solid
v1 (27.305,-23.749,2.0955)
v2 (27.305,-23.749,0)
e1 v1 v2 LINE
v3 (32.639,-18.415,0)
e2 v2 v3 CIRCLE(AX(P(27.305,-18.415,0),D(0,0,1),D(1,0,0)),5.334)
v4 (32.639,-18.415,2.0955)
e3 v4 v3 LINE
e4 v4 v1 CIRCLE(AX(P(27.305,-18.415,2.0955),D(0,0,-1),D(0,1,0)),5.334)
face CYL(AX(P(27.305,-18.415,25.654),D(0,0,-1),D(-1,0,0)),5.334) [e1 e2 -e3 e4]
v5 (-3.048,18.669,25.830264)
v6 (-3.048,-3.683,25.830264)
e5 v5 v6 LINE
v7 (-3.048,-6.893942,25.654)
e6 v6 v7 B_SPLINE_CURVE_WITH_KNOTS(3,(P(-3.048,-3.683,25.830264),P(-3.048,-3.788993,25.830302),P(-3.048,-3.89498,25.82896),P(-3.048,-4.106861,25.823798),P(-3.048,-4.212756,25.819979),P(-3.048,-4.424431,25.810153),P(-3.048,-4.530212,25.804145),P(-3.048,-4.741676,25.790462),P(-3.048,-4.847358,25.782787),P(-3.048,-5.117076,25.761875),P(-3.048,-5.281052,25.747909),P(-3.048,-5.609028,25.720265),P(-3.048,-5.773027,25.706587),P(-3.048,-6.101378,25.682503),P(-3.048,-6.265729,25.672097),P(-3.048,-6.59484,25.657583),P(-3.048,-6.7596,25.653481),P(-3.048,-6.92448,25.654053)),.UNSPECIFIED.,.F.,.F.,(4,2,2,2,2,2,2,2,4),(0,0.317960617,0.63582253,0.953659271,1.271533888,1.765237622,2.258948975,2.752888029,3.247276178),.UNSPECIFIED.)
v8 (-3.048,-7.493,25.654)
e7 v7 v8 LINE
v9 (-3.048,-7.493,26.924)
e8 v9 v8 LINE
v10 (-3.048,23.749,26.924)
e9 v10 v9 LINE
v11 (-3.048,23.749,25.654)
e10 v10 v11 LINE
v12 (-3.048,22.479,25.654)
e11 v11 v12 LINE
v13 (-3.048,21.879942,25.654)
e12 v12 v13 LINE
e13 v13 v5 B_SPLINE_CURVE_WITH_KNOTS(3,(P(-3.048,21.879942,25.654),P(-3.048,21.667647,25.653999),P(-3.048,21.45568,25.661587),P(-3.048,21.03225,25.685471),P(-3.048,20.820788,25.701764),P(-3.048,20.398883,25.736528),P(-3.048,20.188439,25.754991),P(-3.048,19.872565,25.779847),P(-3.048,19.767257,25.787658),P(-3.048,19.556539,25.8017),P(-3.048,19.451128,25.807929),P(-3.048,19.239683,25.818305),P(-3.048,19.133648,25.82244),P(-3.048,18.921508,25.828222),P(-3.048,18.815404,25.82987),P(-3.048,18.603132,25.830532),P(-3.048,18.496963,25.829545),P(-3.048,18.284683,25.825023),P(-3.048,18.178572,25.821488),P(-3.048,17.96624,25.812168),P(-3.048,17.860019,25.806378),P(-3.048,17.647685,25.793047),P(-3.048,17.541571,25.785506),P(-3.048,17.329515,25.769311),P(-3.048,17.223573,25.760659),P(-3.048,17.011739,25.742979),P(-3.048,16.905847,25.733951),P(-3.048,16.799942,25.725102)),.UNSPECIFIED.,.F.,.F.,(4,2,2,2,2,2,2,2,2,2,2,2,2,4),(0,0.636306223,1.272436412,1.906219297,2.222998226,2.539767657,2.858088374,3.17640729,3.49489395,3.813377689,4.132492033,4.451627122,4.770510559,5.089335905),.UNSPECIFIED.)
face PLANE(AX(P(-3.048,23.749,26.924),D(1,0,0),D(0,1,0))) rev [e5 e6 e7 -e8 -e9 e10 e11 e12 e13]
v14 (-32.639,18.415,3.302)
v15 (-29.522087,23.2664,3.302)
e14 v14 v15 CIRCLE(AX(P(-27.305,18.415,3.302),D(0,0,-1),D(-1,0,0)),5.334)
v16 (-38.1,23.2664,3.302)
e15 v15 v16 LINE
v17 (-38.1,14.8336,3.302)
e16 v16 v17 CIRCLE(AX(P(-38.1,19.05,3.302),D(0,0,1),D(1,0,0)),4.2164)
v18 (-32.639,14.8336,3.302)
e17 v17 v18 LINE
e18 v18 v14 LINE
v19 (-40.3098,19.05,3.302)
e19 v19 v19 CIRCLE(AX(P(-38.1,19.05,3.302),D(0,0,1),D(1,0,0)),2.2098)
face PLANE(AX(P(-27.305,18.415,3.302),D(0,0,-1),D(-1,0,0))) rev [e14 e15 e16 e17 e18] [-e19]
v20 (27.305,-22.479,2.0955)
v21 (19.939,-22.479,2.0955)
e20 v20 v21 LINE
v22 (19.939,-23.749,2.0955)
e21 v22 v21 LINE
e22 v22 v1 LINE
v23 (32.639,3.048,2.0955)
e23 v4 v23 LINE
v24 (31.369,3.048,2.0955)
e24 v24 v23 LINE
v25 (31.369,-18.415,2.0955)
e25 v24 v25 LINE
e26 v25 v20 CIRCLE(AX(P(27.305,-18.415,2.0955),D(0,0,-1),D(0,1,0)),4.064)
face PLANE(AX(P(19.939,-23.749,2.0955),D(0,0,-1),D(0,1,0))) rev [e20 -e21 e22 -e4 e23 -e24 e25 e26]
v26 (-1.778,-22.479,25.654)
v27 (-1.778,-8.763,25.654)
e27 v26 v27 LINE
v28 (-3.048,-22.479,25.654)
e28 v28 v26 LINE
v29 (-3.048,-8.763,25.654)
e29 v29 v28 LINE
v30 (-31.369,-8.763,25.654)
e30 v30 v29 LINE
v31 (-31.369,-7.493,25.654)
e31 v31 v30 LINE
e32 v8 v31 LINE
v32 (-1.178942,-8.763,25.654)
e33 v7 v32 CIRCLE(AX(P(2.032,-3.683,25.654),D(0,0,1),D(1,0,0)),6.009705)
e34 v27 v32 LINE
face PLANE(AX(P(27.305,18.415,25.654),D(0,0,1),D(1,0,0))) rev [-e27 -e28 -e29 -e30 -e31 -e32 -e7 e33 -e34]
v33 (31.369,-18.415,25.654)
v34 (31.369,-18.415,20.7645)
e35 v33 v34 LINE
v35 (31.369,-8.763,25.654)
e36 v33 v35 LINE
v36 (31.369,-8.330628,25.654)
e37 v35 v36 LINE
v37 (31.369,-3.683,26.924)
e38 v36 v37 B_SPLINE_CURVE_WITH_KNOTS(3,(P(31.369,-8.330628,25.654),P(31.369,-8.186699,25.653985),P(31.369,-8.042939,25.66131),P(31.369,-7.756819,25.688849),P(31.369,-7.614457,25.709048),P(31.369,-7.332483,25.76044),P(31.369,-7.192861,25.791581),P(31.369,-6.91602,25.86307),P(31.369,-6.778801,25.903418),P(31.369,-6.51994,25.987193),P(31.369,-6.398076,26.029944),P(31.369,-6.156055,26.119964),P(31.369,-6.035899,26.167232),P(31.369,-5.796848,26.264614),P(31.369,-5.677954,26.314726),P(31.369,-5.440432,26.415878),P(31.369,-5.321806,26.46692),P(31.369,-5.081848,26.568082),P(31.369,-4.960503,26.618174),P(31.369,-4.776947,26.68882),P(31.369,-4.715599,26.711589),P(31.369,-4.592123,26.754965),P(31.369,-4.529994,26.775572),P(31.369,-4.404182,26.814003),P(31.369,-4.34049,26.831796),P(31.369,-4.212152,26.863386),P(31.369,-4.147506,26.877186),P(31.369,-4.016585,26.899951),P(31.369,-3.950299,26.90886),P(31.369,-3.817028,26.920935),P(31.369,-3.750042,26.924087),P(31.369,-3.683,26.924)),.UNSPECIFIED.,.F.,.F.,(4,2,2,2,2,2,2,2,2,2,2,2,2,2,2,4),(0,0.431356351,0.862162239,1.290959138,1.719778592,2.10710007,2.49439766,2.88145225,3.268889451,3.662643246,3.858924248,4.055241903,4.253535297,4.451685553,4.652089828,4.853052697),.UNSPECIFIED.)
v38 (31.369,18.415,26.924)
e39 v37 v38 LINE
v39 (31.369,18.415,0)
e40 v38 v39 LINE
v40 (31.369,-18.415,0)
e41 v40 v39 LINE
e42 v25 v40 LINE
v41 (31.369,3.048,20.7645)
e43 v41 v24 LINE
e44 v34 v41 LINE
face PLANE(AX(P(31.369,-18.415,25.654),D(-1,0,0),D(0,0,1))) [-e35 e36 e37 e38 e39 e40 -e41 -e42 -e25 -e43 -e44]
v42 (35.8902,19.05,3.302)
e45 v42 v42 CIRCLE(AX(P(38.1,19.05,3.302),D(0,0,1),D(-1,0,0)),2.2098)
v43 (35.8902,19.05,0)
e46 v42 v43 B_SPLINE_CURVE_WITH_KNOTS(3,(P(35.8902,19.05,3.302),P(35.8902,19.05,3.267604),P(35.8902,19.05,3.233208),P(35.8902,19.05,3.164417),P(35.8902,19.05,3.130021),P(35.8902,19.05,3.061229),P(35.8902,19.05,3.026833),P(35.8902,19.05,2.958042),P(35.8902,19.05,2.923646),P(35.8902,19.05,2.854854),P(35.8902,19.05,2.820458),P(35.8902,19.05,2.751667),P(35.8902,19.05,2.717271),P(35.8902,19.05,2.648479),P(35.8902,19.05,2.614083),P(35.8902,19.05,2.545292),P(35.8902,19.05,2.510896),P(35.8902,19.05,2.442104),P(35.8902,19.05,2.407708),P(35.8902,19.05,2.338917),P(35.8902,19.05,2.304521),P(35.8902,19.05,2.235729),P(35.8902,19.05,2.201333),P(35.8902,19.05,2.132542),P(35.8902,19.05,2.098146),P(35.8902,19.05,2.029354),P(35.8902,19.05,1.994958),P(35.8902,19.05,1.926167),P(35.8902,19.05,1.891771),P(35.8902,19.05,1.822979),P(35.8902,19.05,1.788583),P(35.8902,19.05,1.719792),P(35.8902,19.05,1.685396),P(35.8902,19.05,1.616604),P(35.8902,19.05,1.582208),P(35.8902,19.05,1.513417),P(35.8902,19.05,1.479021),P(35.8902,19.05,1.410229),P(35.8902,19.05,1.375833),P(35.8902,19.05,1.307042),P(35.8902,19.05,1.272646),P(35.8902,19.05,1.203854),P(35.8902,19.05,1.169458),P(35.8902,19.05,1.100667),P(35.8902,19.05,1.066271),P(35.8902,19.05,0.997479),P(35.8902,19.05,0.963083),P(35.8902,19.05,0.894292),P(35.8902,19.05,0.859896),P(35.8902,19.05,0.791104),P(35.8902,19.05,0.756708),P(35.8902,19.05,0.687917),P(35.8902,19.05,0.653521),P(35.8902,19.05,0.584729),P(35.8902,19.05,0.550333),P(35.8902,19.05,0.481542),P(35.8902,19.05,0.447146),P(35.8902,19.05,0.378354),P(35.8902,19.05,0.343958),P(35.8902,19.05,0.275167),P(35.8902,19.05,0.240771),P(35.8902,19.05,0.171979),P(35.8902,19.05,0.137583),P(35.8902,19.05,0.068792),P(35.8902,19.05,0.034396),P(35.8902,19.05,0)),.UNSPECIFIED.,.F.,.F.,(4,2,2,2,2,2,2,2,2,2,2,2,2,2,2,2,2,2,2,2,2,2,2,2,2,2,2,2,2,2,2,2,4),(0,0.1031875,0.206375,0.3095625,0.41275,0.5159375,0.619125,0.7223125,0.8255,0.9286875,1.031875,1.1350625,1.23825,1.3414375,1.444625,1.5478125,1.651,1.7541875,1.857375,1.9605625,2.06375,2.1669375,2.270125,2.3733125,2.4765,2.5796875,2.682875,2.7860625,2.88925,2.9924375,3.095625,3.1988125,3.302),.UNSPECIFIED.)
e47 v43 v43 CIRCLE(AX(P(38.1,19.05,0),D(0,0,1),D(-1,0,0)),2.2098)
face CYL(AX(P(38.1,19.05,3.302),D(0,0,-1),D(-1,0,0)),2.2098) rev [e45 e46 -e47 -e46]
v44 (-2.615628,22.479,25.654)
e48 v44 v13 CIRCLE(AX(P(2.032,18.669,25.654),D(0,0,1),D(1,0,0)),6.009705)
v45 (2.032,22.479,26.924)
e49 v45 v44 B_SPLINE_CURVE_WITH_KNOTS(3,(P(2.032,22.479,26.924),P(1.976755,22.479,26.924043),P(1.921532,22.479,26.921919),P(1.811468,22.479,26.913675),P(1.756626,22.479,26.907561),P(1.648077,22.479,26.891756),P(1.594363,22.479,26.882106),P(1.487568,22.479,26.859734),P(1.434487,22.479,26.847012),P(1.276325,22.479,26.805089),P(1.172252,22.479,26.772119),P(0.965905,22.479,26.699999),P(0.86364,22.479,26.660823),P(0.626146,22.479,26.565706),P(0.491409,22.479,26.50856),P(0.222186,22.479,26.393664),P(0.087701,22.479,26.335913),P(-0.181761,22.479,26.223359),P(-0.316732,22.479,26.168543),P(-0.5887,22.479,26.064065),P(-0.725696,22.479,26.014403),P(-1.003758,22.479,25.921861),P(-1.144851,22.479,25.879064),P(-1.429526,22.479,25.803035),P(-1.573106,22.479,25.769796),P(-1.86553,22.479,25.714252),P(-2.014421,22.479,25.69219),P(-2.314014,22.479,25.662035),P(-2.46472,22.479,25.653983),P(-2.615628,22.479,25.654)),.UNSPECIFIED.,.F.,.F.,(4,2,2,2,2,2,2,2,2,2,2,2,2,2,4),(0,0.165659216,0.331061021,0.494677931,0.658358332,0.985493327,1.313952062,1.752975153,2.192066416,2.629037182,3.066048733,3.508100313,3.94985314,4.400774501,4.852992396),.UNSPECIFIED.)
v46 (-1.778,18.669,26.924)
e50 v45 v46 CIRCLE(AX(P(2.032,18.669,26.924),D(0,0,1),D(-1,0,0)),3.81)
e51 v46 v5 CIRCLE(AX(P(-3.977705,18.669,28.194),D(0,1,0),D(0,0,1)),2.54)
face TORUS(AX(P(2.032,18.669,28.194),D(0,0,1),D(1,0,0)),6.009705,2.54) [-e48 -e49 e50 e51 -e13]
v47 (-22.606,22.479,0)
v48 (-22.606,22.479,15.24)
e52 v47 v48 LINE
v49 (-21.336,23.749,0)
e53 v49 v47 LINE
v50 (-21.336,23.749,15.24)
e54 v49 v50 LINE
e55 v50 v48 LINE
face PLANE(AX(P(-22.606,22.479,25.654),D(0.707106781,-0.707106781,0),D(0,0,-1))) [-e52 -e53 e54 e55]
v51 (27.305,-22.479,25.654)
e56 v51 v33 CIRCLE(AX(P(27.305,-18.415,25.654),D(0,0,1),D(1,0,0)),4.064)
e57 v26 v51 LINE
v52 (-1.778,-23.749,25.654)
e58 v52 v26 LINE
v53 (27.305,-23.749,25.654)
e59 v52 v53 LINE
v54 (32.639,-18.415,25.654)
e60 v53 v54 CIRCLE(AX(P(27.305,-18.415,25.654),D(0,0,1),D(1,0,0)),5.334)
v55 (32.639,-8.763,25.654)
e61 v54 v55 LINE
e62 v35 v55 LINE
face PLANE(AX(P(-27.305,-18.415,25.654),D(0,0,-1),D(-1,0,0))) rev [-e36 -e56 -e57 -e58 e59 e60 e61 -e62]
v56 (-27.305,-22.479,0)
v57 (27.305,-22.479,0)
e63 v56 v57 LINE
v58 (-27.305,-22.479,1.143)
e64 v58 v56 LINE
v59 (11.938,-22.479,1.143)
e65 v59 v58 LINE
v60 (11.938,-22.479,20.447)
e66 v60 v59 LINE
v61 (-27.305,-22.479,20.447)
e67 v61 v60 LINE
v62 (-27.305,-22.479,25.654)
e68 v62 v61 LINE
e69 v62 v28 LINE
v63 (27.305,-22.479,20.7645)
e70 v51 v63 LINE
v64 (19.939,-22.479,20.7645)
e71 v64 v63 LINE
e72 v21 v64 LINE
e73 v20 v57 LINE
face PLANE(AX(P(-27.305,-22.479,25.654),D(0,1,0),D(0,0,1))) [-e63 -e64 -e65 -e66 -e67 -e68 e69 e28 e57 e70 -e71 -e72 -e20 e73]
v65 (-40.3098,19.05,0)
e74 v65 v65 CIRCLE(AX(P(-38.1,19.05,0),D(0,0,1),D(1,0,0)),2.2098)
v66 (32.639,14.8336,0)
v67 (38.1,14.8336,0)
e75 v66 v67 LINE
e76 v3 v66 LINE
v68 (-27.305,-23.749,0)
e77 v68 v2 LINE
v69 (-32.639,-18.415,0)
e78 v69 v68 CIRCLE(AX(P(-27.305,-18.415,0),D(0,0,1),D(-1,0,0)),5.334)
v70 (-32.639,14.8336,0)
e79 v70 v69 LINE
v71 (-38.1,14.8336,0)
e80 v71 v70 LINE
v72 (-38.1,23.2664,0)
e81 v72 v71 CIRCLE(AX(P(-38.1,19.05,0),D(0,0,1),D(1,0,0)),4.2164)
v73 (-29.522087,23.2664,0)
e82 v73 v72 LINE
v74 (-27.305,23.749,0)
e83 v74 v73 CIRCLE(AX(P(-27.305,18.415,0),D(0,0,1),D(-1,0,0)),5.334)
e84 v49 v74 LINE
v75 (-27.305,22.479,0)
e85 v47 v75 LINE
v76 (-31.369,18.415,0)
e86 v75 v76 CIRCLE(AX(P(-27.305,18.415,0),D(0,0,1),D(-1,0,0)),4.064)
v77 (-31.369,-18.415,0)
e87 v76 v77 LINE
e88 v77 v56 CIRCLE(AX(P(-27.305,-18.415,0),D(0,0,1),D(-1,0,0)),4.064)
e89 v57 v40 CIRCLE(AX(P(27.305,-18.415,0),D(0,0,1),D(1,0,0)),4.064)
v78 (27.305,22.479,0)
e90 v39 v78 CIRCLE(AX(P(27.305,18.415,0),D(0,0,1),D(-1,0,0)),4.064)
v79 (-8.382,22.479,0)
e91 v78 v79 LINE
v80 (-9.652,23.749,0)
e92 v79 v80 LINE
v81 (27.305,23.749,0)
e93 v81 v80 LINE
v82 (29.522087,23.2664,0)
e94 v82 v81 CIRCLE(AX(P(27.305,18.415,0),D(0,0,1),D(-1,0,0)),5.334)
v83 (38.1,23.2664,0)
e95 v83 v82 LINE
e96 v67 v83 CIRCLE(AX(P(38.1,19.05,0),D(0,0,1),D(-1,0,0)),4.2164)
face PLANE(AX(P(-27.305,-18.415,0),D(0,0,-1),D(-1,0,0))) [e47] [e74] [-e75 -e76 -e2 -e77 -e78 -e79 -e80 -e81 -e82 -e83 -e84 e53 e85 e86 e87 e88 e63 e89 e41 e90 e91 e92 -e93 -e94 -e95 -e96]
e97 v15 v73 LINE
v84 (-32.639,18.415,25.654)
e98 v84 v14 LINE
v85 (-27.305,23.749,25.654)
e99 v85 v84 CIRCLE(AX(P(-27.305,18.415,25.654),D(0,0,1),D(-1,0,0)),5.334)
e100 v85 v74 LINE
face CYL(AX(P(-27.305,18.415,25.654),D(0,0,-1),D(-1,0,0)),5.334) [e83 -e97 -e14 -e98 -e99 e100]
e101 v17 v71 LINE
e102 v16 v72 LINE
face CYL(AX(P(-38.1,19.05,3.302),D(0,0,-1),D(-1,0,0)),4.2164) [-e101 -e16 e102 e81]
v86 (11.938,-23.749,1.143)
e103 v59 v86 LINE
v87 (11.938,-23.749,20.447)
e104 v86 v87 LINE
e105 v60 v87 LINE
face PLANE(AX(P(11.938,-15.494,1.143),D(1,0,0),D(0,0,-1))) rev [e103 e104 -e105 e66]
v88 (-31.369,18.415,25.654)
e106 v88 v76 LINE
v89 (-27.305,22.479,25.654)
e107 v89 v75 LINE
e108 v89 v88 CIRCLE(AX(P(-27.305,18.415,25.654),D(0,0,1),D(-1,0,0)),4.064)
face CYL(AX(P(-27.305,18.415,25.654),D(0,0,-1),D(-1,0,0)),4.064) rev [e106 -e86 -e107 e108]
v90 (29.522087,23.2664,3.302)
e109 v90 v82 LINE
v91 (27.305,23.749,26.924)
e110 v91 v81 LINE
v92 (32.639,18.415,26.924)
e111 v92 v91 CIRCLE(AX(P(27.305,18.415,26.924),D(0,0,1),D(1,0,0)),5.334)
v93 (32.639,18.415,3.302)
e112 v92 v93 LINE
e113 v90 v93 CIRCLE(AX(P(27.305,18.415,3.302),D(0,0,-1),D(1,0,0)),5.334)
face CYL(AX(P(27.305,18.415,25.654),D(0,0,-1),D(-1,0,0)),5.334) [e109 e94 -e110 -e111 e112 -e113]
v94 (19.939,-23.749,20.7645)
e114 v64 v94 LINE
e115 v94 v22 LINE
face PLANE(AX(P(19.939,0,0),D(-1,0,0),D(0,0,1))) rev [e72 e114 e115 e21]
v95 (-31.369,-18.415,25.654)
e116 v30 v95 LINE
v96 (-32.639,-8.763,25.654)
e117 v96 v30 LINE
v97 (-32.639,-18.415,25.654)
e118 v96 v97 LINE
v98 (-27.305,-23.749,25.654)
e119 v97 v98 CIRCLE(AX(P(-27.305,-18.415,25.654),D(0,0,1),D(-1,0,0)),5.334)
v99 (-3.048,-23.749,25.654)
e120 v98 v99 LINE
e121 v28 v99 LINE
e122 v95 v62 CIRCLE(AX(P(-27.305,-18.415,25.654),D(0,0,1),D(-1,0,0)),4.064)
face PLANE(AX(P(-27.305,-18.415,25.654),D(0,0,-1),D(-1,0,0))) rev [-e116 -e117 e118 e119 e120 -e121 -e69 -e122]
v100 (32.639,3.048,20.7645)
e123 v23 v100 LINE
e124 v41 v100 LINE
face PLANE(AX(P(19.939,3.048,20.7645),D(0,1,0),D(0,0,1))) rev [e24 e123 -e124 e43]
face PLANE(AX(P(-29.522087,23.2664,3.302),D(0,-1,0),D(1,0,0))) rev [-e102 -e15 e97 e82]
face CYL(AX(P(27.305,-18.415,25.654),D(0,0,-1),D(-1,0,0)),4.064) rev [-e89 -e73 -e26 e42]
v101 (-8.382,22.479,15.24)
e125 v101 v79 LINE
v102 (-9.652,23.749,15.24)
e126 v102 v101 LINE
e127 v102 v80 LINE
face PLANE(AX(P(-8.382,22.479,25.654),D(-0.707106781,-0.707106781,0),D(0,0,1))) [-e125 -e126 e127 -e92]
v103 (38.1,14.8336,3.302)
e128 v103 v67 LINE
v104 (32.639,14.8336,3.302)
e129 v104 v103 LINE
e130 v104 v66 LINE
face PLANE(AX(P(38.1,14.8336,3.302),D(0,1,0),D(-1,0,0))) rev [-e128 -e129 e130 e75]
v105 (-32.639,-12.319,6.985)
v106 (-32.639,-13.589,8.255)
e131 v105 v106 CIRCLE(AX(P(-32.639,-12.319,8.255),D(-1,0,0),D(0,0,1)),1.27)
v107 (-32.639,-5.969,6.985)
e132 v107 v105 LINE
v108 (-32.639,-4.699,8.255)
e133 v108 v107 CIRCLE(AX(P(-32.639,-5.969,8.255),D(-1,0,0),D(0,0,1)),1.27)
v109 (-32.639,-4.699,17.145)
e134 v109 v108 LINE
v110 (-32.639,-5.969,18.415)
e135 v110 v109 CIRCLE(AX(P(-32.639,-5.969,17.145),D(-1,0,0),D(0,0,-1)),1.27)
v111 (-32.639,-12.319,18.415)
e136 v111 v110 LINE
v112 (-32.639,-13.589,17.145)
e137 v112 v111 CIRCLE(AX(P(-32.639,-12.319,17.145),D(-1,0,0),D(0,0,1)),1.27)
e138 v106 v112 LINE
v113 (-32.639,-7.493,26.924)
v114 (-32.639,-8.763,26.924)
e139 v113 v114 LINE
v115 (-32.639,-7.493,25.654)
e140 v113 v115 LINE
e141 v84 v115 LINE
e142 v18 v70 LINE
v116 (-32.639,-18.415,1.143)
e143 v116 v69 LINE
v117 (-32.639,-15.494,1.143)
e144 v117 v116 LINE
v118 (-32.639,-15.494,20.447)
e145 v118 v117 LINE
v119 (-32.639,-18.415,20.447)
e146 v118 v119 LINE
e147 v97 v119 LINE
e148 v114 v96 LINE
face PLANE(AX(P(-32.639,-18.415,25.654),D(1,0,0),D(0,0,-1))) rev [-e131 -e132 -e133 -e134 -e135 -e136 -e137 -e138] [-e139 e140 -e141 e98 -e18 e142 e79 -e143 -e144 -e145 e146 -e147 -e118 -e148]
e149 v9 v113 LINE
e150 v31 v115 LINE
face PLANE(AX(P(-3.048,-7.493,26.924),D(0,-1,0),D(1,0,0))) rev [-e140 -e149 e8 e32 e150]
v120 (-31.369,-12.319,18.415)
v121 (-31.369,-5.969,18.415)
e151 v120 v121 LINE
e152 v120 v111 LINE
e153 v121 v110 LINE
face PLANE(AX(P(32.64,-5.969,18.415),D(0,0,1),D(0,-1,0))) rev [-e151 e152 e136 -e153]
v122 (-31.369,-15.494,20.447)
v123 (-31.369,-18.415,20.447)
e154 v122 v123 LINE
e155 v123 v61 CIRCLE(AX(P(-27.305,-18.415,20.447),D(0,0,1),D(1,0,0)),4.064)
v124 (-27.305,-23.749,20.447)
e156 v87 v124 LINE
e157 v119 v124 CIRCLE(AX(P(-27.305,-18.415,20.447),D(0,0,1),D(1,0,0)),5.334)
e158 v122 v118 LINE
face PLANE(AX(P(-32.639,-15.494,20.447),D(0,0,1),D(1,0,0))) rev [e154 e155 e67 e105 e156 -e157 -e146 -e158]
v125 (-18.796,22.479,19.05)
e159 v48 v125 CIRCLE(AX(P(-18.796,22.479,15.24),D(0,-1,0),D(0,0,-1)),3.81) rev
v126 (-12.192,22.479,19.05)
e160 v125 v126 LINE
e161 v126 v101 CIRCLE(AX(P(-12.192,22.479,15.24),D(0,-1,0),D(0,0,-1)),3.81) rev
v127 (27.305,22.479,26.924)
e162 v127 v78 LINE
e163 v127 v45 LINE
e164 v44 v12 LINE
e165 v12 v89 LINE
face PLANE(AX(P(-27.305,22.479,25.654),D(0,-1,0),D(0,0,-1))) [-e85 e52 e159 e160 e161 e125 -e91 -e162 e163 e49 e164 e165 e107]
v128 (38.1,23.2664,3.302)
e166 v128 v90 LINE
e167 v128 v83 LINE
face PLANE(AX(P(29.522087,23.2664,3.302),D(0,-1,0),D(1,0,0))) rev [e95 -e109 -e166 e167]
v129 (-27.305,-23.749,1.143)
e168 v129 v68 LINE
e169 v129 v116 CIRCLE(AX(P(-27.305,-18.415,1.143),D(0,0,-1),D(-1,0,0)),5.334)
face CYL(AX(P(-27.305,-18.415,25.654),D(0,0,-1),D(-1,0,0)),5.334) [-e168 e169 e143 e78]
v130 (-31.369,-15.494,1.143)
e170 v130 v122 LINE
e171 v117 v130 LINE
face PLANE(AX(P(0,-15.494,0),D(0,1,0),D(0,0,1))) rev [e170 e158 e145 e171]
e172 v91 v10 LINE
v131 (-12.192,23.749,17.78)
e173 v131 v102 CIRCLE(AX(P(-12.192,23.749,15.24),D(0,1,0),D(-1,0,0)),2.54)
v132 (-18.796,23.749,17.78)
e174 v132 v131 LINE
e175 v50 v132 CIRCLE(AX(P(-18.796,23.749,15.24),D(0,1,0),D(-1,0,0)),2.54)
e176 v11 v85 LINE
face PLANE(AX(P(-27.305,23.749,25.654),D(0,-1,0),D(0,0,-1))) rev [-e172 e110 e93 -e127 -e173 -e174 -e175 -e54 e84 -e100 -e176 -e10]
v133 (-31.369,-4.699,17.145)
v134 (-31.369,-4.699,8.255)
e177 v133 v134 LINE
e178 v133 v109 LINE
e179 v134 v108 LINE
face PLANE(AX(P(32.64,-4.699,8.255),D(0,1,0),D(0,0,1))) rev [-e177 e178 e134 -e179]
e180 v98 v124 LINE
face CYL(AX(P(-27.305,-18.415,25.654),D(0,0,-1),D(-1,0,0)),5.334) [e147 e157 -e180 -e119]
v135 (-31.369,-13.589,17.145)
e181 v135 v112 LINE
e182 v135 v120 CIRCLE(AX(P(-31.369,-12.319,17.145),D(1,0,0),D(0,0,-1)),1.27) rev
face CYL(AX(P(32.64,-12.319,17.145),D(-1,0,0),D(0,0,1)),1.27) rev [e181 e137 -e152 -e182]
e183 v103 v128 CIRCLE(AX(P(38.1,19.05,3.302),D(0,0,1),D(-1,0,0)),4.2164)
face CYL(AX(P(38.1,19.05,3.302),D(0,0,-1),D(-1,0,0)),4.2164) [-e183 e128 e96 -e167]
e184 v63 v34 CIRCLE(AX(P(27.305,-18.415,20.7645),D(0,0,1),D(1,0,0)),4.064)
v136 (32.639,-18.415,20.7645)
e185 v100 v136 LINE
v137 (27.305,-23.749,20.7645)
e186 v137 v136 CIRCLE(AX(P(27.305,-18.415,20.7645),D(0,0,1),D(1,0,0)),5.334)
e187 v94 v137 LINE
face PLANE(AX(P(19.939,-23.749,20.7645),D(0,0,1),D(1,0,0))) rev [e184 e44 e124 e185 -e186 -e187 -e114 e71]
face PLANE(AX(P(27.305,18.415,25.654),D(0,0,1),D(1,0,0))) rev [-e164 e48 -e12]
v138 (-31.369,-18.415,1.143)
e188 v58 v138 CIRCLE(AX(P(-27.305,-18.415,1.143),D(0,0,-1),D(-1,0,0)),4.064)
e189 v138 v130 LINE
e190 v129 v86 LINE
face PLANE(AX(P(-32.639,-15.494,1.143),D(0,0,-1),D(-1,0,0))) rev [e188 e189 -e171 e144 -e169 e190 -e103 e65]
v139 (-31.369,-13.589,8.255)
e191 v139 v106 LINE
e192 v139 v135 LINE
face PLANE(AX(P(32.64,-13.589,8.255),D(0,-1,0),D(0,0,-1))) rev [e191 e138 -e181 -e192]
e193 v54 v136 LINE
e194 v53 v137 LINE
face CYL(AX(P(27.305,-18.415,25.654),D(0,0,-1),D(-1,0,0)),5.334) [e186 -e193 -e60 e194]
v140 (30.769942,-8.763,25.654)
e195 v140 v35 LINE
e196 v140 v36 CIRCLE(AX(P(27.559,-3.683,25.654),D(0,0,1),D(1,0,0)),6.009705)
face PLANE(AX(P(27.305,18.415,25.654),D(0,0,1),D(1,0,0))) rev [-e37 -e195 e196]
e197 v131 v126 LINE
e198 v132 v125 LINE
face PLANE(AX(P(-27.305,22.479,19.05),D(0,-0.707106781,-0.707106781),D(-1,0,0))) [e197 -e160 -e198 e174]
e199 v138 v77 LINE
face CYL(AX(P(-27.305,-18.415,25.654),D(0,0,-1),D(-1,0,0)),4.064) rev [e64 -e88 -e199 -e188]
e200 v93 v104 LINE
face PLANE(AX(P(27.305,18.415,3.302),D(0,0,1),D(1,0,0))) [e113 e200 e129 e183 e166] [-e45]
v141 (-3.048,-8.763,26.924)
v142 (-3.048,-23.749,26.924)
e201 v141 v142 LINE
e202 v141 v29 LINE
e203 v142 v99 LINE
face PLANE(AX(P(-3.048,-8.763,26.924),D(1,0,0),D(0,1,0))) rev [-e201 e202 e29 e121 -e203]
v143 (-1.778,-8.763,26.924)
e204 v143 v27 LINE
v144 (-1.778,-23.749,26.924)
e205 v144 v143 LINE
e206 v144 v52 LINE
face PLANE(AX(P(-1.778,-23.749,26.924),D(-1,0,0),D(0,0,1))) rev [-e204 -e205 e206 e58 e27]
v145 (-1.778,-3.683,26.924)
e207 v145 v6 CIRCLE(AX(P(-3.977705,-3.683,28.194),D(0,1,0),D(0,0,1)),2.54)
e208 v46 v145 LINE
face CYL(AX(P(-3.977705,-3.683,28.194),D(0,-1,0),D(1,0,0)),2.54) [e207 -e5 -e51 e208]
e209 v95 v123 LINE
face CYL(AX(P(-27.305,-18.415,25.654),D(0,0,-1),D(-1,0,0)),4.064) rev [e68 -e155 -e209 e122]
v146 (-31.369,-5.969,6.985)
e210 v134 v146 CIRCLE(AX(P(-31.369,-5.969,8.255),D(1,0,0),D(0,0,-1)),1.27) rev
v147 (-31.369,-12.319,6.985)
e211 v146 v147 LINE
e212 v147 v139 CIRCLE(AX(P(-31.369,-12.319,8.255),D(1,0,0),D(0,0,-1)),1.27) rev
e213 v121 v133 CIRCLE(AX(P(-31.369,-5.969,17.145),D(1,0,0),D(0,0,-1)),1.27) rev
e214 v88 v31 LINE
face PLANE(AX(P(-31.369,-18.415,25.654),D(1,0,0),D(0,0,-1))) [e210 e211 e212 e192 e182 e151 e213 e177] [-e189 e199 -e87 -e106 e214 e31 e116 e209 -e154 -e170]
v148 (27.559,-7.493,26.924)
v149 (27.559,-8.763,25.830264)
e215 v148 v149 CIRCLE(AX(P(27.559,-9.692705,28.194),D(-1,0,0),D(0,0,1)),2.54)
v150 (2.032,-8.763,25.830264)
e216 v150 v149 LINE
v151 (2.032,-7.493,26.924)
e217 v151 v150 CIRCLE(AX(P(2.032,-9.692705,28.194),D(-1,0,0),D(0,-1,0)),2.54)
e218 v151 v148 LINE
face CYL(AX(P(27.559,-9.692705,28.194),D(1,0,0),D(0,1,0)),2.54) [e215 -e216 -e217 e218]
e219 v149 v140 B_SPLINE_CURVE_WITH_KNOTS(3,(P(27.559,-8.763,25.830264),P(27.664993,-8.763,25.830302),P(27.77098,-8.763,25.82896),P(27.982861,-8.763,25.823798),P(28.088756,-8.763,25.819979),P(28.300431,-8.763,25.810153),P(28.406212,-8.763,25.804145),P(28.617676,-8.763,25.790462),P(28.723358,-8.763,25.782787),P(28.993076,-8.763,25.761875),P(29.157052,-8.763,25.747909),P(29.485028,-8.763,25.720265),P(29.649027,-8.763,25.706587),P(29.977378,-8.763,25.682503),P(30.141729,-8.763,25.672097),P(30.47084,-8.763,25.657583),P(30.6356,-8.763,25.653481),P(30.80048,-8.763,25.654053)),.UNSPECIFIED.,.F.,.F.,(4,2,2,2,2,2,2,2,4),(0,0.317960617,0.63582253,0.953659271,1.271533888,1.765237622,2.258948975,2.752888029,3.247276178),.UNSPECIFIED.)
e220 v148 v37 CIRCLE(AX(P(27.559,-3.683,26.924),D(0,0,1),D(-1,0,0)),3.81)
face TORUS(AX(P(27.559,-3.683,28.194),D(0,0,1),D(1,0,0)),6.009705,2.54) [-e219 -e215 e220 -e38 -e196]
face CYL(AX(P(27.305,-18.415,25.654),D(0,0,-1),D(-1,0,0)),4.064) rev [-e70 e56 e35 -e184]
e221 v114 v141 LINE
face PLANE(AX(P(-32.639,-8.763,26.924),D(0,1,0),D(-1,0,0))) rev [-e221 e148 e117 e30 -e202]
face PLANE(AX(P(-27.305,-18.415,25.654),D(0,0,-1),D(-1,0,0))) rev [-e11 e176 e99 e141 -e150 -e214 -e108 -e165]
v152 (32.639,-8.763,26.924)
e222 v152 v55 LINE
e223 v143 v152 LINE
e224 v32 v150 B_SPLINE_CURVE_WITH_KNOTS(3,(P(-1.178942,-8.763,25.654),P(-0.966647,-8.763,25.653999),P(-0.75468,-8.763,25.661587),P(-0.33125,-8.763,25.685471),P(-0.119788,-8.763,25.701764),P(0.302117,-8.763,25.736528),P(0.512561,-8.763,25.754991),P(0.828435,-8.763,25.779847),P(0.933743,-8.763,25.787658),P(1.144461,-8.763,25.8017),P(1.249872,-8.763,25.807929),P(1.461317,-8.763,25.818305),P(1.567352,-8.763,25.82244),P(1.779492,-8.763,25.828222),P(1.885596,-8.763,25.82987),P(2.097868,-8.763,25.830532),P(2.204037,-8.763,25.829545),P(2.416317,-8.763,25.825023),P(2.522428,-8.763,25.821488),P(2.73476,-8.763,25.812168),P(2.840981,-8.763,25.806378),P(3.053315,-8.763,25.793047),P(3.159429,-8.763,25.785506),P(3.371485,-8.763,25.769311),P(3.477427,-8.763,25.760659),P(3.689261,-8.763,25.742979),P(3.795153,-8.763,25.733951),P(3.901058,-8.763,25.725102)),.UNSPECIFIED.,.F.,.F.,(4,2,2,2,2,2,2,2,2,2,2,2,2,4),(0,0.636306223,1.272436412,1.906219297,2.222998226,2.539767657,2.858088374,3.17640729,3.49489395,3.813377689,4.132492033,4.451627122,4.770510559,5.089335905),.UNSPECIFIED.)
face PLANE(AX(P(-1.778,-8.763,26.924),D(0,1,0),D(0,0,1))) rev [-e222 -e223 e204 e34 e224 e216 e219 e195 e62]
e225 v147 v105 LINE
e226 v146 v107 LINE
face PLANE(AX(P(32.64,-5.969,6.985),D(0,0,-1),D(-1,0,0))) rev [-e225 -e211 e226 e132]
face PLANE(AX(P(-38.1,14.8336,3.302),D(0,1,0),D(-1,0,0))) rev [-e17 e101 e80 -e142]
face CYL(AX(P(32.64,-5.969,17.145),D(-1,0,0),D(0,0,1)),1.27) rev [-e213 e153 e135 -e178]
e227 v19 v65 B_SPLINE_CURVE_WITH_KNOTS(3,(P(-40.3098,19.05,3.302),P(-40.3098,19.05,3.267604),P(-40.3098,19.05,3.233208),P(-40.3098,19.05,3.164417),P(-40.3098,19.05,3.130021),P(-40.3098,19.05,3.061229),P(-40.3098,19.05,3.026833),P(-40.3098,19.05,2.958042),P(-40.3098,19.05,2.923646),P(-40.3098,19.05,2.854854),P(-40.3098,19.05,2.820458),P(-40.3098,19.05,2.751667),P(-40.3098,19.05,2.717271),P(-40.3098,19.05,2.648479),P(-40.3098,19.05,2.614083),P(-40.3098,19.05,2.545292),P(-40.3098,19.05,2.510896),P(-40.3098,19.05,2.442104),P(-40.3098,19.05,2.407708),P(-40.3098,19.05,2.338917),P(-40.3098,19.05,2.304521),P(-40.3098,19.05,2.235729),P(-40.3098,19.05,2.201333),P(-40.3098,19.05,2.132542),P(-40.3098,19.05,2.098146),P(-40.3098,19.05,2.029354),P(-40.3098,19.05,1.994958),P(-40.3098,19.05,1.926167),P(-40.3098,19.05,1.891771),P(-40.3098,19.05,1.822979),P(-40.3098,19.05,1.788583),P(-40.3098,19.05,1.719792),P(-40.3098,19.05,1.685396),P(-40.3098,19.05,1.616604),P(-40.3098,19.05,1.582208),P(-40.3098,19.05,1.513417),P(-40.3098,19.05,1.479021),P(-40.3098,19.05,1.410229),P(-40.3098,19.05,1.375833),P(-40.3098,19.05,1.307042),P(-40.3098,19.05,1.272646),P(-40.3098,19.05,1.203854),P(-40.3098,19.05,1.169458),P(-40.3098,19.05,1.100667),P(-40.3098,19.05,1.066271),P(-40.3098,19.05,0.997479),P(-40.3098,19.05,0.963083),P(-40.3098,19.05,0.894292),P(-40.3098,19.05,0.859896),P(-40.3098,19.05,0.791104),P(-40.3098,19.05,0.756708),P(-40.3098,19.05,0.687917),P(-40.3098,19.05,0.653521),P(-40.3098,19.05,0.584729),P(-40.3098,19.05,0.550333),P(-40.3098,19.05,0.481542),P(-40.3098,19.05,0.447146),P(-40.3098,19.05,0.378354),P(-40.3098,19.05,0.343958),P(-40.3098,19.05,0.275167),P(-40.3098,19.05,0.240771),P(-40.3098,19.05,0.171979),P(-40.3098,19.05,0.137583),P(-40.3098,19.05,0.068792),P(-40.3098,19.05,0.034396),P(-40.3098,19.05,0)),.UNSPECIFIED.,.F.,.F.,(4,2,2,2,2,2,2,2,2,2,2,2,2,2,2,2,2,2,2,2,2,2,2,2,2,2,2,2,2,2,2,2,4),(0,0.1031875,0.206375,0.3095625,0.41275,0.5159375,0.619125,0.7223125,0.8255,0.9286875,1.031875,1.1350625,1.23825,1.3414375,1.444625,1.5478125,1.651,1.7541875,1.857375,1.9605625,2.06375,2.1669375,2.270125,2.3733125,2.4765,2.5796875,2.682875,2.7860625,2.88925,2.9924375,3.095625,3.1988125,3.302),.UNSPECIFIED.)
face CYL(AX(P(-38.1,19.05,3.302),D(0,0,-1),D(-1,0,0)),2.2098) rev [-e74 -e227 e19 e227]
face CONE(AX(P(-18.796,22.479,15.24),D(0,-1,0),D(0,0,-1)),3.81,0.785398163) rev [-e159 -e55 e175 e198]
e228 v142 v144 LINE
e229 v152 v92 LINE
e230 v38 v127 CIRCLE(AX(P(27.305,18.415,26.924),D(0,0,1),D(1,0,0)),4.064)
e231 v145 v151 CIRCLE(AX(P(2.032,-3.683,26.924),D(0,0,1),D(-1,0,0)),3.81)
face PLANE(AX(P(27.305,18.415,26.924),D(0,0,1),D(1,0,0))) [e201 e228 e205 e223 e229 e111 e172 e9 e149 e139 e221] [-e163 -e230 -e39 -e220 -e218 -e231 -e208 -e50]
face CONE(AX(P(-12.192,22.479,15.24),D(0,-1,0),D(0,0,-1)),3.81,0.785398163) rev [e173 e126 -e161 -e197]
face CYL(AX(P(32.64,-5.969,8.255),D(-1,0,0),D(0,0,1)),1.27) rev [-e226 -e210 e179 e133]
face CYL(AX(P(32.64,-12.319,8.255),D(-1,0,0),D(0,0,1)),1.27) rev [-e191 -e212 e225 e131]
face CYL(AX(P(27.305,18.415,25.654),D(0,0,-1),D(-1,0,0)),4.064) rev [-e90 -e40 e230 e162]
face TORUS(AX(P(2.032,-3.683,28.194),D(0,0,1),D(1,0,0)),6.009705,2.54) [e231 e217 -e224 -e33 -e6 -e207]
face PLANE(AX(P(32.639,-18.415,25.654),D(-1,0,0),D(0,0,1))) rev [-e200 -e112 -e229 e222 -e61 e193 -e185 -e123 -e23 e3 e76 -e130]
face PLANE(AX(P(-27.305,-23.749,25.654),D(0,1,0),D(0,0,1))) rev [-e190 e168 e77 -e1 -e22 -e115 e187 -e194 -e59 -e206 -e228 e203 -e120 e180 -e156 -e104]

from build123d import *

# Parameters (mm, degrees)
BOSS_EXTRUDE1_DEPTH = 25.654
BOSS_EXTRUDE2_DEPTH = 1.27
CUT_EXTRUDE1_REACH  = 65.61
CUT_EXTRUDE2_REACH  = 76.499
SKETCH7_W           = 44.577
SKETCH7_H           = 19.304
CUT_EXTRUDE3_DEPTH  = 8.255
SKETCH8_W           = 18.669
SKETCH8_H           = 26.797
CUT_EXTRUDE4_DEPTH  = 12.7
FILLET2_R           = 2.54
SKETCH9_R           = 2.2098
BOSS_EXTRUDE3_DEPTH = 3.302
CHAMFER1_SIZE       = 1.27


# Some blends are built 0.0001 mm under size
with BuildPart() as part:
    # Sketch2 → Boss-Extrude1 (new body)
    with BuildSketch(Plane.XY):
        with BuildLine():
            Line((-27.305, -23.749), (27.305, -23.749))
            ThreePointArc((27.305, -23.749), (31.076707571, -22.186707571), (32.639, -18.415))
            Line((32.639, -18.415), (32.639, 18.415))
            ThreePointArc((32.639, 18.415), (31.076707571, 22.186707571), (27.305, 23.749))
            Line((27.305, 23.749), (-27.305, 23.749))
            ThreePointArc((-27.305, 23.749), (-31.076707571, 22.186707571), (-32.639, 18.415))
            Line((-32.639, 18.415), (-32.639, -18.415))
            ThreePointArc((-32.639, -18.415), (-31.076707571, -22.186707571), (-27.305, -23.749))
        make_face()
        with BuildLine():
            Line((-27.305, -22.479), (27.305, -22.479))
            ThreePointArc((27.305, -22.479), (30.178681959, -21.288681959), (31.369, -18.415))
            Line((31.369, -18.415), (31.369, 18.415))
            ThreePointArc((31.369, 18.415), (30.178681959, 21.288681959), (27.305, 22.479))
            Line((27.305, 22.479), (-27.305, 22.479))
            ThreePointArc((-27.305, 22.479), (-30.178681959, 21.288681959), (-31.369, 18.415))
            Line((-31.369, 18.415), (-31.369, -18.415))
            ThreePointArc((-31.369, -18.415), (-30.178681959, -21.288681959), (-27.305, -22.479))
        make_face(mode=Mode.SUBTRACT)
    extrude(amount=BOSS_EXTRUDE1_DEPTH)

    # Sketch3 → Boss-Extrude2 (add)
    with BuildSketch(Plane.XY.offset(25.654)):
        with BuildLine():
            Line((-1.778, 23.749), (27.305, 23.749))
            ThreePointArc((27.305, 23.749), (31.076707571, 22.186707571), (32.639, 18.415))
            Line((32.639, 18.415), (32.639, -7.493))
            Line((32.639, -7.493), (32.639, -8.763))
            Line((32.639, -8.763), (-1.778, -8.763))
            Line((-1.778, -8.763), (-1.778, -23.749))
            Line((-1.778, -23.749), (-3.048, -23.749))
            Line((-3.048, -23.749), (-3.048, -8.763))
            Line((-3.048, -8.763), (-32.639, -8.763))
            Line((-32.639, -8.763), (-32.639, -7.493))
            Line((-32.639, -7.493), (-3.048, -7.493))
            Line((-3.048, -7.493), (-3.048, 23.749))
            Line((-3.048, 23.749), (-1.778, 23.749))
        make_face()
        with BuildLine():
            Line((27.559, -7.493), (2.032, -7.493))
            ThreePointArc((2.032, -7.493), (-0.662076836, -6.377076836), (-1.778, -3.683))
            Line((-1.778, -3.683), (-1.778, 18.669))
            ThreePointArc((-1.778, 18.669), (-0.662076836, 21.363076836), (2.032, 22.479))
            Line((2.032, 22.479), (27.305, 22.479))
            ThreePointArc((27.305, 22.479), (30.178681959, 21.288681959), (31.369, 18.415))
            Line((31.369, 18.415), (31.369, -3.683))
            ThreePointArc((31.369, -3.683), (30.253076836, -6.377076836), (27.559, -7.493))
        make_face(mode=Mode.SUBTRACT)
    extrude(amount=BOSS_EXTRUDE2_DEPTH)

    # Sketch5 → Cut-Extrude1 (cut, up to next)
    with BuildSketch(Plane(origin=(0, 23.749, 0), x_dir=(1, 0, 0), z_dir=(0, 1, 0)), mode=Mode.PRIVATE) as cut_extrude1_sk1:
        with BuildLine():
            Line((-21.336, 0), (-21.336, -15.24))
            ThreePointArc((-21.336, -15.24), (-20.592051224, -17.036051224), (-18.796, -17.78))
            Line((-18.796, -17.78), (-12.192, -17.78))
            ThreePointArc((-12.192, -17.78), (-10.395948776, -17.036051224), (-9.652, -15.24))
            Line((-9.652, -15.24), (-9.652, 0))
            Line((-9.652, 0), (-21.336, 0))
        make_face()
    cut_extrude1_tool1 = extrude(cut_extrude1_sk1.sketch, amount=-CUT_EXTRUDE1_REACH, mode=Mode.PRIVATE) & part.part
    add(cut_extrude1_tool1.solids().sort_by_distance((-15.494, 23.749, 8.777566))[0], mode=Mode.SUBTRACT)

    # Sketch6 → Cut-Extrude2 (cut, up to next)
    with BuildSketch(Plane.ZY.offset(32.639), mode=Mode.PRIVATE) as cut_extrude2_sk1:
        with BuildLine():
            Line((8.255, -4.699), (17.145, -4.699))
            ThreePointArc((17.145, -4.699), (18.043025612, -5.070974388), (18.415, -5.969))
            Line((18.415, -5.969), (18.415, -12.319))
            ThreePointArc((18.415, -12.319), (18.043025612, -13.217025612), (17.145, -13.589))
            Line((17.145, -13.589), (8.255, -13.589))
            ThreePointArc((8.255, -13.589), (7.356974388, -13.217025612), (6.985, -12.319))
            Line((6.985, -12.319), (6.985, -5.969))
            ThreePointArc((6.985, -5.969), (7.356974388, -5.070974388), (8.255, -4.699))
        make_face()
    cut_extrude2_tool1 = extrude(cut_extrude2_sk1.sketch, amount=-CUT_EXTRUDE2_REACH, mode=Mode.PRIVATE) & part.part
    add(cut_extrude2_tool1.solids().sort_by_distance((-32.639, -9.144, 12.7))[0], mode=Mode.SUBTRACT)

    # Sketch7 → Cut-Extrude3 (cut)
    with BuildSketch(Plane.XZ.offset(23.749)):
        with Locations((-10.3505, 10.795)):
            Rectangle(SKETCH7_W, SKETCH7_H)
    extrude(amount=-CUT_EXTRUDE3_DEPTH, mode=Mode.SUBTRACT)

    # Sketch8 → Cut-Extrude4 (cut)
    with BuildSketch(Plane(origin=(32.639, 0, 0), x_dir=(0, 0, -1), z_dir=(1, 0, 0))):
        with Locations((-11.43, -10.3505)):
            Rectangle(SKETCH8_W, SKETCH8_H)
    extrude(amount=-CUT_EXTRUDE4_DEPTH, mode=Mode.SUBTRACT)

    # Fillet2
    # the kernel refuses this fillet: 2.54 mm, written as the material it takes off along each edge
    with BuildSketch(Plane(origin=(2.032, 18.669, 25.654), x_dir=(-1, 0, 0), z_dir=(0, -1, 0))) as fillet2_piece_1_section:
        with BuildLine():
            CenterArc((6.009704526, -2.54), FILLET2_R, 90, 60)
            Line((3.81, -1.27), (3.81, 0))
            Line((3.81, 0), (6.009704526, 0))
        make_face()
    fillet2_piece_1 = revolve(axis=Axis((2.032, 18.669, 25.654), (0, 0, -1)), revolution_arc=172.73255531, mode=Mode.PRIVATE)
    fillet2_piece_1 = split(fillet2_piece_1, bisect_by=Plane(origin=(2.032, 22.479, 25.654), z_dir=(0, -1, 0)), keep=Keep.TOP, mode=Mode.PRIVATE)
    add(fillet2_piece_1, mode=Mode.SUBTRACT)
    with BuildSketch(Plane(origin=(2.032, -3.683, 25.654), x_dir=(0, -1, 0), z_dir=(1, 0, 0))) as fillet2_piece_2:
        with BuildLine():
            CenterArc((6.009704526, -2.54), FILLET2_R, 90, 60)
            Line((3.81, -1.27), (3.81, 0))
            Line((3.81, 0), (6.009704526, 0))
        make_face()
    revolve(axis=Axis((2.032, -3.683, 25.654), (0, 0, -1)), revolution_arc=90, mode=Mode.SUBTRACT)
    with BuildSketch(Plane(origin=(27.559, -3.683, 25.654), x_dir=(0.1265009963233053, 0.9919664802447767, 0), z_dir=(-0.9919664802447767, 0.1265009963233053, 0))) as fillet2_piece_3_section:
        with BuildLine():
            CenterArc((6.009704526, -2.54), FILLET2_R, 90, 60)
            Line((3.81, -1.27), (3.81, 0))
            Line((3.81, 0), (6.009704526, 0))
        make_face()
    fillet2_piece_3 = revolve(axis=Axis((27.559, -3.683, 25.654), (0, 0, -1)), revolution_arc=172.73255531, mode=Mode.PRIVATE)
    fillet2_piece_3 = split(fillet2_piece_3, bisect_by=Plane(origin=(31.369, -3.683, 25.654), z_dir=(-1, 0, 0)), keep=Keep.TOP, mode=Mode.PRIVATE)
    add(fillet2_piece_3, mode=Mode.SUBTRACT)
    with BuildSketch(Plane(origin=(27.559, -7.493, 25.654), x_dir=(0, -1, 0), z_dir=(-1, 0, 0))) as fillet2_piece_4:
        with BuildLine():
            CenterArc((2.199704526, 2.54), FILLET2_R, 210, 60)
            Line((0, 1.27), (0, 0))
            Line((0, 0), (2.199704526, 0))
        make_face()
    extrude(amount=25.527, mode=Mode.SUBTRACT)
    with BuildSketch(Plane(origin=(-1.778, -3.683, 25.654), x_dir=(-1, 0, 0), z_dir=(0, 1, 0))) as fillet2_piece_5:
        with BuildLine():
            CenterArc((2.199704526, 2.54), FILLET2_R, 210, 60)
            Line((0, 1.27), (0, 0))
            Line((0, 0), (2.199704526, 0))
        make_face()
    extrude(amount=22.352, mode=Mode.SUBTRACT)

    # Sketch9 → Boss-Extrude3 (add)
    # profile 1 of 2: a face of its own
    with BuildSketch(Plane.XY):
        with BuildLine():
            Line((-29.522086836, 23.2664), (-38.1, 23.2664))
            ThreePointArc((-38.1, 23.2664), (-42.3164, 19.05), (-38.1, 14.8336))
            Line((-38.1, 14.8336), (-32.639, 14.8336))
            Line((-32.639, 14.8336), (-32.639, 18.415))
            ThreePointArc((-32.639, 18.415), (-31.792621708, 21.298193959), (-29.522086836, 23.2664))
        make_face()
        with Locations(Location((-38.1, 19.05, 0), (0, 0, 180))):
            Circle(SKETCH9_R, mode=Mode.SUBTRACT)
    # profile 2 of 2: a face of its own
    with BuildSketch(Plane.XY):
        with BuildLine():
            Line((29.522086836, 23.2664), (38.1, 23.2664))
            ThreePointArc((38.1, 23.2664), (42.3164, 19.05), (38.1, 14.8336))
            Line((38.1, 14.8336), (32.639, 14.8336))
            Line((32.639, 14.8336), (32.639, 18.415))
            ThreePointArc((32.639, 18.415), (31.792621708, 21.298193959), (29.522086836, 23.2664))
        make_face()
        with Locations(Location((38.1, 19.05, 0), (0, 0, 180))):
            Circle(SKETCH9_R, mode=Mode.SUBTRACT)
    extrude(amount=BOSS_EXTRUDE3_DEPTH)

    # Chamfer1
    chamfer1_edges = [part.edges().sort_by_distance(p)[0] for p in [
        (-21.336, 22.479, 7.62),
        (-20.592051224, 22.479, 17.036051224),
        (-15.494, 22.479, 17.78),
        (-10.395948776, 22.479, 17.036051224),
        (-9.652, 22.479, 7.62),
    ]]
    chamfer(chamfer1_edges, length=CHAMFER1_SIZE - 0.0001)  # a hair under: the kernel refuses the full size


solid = part.part
